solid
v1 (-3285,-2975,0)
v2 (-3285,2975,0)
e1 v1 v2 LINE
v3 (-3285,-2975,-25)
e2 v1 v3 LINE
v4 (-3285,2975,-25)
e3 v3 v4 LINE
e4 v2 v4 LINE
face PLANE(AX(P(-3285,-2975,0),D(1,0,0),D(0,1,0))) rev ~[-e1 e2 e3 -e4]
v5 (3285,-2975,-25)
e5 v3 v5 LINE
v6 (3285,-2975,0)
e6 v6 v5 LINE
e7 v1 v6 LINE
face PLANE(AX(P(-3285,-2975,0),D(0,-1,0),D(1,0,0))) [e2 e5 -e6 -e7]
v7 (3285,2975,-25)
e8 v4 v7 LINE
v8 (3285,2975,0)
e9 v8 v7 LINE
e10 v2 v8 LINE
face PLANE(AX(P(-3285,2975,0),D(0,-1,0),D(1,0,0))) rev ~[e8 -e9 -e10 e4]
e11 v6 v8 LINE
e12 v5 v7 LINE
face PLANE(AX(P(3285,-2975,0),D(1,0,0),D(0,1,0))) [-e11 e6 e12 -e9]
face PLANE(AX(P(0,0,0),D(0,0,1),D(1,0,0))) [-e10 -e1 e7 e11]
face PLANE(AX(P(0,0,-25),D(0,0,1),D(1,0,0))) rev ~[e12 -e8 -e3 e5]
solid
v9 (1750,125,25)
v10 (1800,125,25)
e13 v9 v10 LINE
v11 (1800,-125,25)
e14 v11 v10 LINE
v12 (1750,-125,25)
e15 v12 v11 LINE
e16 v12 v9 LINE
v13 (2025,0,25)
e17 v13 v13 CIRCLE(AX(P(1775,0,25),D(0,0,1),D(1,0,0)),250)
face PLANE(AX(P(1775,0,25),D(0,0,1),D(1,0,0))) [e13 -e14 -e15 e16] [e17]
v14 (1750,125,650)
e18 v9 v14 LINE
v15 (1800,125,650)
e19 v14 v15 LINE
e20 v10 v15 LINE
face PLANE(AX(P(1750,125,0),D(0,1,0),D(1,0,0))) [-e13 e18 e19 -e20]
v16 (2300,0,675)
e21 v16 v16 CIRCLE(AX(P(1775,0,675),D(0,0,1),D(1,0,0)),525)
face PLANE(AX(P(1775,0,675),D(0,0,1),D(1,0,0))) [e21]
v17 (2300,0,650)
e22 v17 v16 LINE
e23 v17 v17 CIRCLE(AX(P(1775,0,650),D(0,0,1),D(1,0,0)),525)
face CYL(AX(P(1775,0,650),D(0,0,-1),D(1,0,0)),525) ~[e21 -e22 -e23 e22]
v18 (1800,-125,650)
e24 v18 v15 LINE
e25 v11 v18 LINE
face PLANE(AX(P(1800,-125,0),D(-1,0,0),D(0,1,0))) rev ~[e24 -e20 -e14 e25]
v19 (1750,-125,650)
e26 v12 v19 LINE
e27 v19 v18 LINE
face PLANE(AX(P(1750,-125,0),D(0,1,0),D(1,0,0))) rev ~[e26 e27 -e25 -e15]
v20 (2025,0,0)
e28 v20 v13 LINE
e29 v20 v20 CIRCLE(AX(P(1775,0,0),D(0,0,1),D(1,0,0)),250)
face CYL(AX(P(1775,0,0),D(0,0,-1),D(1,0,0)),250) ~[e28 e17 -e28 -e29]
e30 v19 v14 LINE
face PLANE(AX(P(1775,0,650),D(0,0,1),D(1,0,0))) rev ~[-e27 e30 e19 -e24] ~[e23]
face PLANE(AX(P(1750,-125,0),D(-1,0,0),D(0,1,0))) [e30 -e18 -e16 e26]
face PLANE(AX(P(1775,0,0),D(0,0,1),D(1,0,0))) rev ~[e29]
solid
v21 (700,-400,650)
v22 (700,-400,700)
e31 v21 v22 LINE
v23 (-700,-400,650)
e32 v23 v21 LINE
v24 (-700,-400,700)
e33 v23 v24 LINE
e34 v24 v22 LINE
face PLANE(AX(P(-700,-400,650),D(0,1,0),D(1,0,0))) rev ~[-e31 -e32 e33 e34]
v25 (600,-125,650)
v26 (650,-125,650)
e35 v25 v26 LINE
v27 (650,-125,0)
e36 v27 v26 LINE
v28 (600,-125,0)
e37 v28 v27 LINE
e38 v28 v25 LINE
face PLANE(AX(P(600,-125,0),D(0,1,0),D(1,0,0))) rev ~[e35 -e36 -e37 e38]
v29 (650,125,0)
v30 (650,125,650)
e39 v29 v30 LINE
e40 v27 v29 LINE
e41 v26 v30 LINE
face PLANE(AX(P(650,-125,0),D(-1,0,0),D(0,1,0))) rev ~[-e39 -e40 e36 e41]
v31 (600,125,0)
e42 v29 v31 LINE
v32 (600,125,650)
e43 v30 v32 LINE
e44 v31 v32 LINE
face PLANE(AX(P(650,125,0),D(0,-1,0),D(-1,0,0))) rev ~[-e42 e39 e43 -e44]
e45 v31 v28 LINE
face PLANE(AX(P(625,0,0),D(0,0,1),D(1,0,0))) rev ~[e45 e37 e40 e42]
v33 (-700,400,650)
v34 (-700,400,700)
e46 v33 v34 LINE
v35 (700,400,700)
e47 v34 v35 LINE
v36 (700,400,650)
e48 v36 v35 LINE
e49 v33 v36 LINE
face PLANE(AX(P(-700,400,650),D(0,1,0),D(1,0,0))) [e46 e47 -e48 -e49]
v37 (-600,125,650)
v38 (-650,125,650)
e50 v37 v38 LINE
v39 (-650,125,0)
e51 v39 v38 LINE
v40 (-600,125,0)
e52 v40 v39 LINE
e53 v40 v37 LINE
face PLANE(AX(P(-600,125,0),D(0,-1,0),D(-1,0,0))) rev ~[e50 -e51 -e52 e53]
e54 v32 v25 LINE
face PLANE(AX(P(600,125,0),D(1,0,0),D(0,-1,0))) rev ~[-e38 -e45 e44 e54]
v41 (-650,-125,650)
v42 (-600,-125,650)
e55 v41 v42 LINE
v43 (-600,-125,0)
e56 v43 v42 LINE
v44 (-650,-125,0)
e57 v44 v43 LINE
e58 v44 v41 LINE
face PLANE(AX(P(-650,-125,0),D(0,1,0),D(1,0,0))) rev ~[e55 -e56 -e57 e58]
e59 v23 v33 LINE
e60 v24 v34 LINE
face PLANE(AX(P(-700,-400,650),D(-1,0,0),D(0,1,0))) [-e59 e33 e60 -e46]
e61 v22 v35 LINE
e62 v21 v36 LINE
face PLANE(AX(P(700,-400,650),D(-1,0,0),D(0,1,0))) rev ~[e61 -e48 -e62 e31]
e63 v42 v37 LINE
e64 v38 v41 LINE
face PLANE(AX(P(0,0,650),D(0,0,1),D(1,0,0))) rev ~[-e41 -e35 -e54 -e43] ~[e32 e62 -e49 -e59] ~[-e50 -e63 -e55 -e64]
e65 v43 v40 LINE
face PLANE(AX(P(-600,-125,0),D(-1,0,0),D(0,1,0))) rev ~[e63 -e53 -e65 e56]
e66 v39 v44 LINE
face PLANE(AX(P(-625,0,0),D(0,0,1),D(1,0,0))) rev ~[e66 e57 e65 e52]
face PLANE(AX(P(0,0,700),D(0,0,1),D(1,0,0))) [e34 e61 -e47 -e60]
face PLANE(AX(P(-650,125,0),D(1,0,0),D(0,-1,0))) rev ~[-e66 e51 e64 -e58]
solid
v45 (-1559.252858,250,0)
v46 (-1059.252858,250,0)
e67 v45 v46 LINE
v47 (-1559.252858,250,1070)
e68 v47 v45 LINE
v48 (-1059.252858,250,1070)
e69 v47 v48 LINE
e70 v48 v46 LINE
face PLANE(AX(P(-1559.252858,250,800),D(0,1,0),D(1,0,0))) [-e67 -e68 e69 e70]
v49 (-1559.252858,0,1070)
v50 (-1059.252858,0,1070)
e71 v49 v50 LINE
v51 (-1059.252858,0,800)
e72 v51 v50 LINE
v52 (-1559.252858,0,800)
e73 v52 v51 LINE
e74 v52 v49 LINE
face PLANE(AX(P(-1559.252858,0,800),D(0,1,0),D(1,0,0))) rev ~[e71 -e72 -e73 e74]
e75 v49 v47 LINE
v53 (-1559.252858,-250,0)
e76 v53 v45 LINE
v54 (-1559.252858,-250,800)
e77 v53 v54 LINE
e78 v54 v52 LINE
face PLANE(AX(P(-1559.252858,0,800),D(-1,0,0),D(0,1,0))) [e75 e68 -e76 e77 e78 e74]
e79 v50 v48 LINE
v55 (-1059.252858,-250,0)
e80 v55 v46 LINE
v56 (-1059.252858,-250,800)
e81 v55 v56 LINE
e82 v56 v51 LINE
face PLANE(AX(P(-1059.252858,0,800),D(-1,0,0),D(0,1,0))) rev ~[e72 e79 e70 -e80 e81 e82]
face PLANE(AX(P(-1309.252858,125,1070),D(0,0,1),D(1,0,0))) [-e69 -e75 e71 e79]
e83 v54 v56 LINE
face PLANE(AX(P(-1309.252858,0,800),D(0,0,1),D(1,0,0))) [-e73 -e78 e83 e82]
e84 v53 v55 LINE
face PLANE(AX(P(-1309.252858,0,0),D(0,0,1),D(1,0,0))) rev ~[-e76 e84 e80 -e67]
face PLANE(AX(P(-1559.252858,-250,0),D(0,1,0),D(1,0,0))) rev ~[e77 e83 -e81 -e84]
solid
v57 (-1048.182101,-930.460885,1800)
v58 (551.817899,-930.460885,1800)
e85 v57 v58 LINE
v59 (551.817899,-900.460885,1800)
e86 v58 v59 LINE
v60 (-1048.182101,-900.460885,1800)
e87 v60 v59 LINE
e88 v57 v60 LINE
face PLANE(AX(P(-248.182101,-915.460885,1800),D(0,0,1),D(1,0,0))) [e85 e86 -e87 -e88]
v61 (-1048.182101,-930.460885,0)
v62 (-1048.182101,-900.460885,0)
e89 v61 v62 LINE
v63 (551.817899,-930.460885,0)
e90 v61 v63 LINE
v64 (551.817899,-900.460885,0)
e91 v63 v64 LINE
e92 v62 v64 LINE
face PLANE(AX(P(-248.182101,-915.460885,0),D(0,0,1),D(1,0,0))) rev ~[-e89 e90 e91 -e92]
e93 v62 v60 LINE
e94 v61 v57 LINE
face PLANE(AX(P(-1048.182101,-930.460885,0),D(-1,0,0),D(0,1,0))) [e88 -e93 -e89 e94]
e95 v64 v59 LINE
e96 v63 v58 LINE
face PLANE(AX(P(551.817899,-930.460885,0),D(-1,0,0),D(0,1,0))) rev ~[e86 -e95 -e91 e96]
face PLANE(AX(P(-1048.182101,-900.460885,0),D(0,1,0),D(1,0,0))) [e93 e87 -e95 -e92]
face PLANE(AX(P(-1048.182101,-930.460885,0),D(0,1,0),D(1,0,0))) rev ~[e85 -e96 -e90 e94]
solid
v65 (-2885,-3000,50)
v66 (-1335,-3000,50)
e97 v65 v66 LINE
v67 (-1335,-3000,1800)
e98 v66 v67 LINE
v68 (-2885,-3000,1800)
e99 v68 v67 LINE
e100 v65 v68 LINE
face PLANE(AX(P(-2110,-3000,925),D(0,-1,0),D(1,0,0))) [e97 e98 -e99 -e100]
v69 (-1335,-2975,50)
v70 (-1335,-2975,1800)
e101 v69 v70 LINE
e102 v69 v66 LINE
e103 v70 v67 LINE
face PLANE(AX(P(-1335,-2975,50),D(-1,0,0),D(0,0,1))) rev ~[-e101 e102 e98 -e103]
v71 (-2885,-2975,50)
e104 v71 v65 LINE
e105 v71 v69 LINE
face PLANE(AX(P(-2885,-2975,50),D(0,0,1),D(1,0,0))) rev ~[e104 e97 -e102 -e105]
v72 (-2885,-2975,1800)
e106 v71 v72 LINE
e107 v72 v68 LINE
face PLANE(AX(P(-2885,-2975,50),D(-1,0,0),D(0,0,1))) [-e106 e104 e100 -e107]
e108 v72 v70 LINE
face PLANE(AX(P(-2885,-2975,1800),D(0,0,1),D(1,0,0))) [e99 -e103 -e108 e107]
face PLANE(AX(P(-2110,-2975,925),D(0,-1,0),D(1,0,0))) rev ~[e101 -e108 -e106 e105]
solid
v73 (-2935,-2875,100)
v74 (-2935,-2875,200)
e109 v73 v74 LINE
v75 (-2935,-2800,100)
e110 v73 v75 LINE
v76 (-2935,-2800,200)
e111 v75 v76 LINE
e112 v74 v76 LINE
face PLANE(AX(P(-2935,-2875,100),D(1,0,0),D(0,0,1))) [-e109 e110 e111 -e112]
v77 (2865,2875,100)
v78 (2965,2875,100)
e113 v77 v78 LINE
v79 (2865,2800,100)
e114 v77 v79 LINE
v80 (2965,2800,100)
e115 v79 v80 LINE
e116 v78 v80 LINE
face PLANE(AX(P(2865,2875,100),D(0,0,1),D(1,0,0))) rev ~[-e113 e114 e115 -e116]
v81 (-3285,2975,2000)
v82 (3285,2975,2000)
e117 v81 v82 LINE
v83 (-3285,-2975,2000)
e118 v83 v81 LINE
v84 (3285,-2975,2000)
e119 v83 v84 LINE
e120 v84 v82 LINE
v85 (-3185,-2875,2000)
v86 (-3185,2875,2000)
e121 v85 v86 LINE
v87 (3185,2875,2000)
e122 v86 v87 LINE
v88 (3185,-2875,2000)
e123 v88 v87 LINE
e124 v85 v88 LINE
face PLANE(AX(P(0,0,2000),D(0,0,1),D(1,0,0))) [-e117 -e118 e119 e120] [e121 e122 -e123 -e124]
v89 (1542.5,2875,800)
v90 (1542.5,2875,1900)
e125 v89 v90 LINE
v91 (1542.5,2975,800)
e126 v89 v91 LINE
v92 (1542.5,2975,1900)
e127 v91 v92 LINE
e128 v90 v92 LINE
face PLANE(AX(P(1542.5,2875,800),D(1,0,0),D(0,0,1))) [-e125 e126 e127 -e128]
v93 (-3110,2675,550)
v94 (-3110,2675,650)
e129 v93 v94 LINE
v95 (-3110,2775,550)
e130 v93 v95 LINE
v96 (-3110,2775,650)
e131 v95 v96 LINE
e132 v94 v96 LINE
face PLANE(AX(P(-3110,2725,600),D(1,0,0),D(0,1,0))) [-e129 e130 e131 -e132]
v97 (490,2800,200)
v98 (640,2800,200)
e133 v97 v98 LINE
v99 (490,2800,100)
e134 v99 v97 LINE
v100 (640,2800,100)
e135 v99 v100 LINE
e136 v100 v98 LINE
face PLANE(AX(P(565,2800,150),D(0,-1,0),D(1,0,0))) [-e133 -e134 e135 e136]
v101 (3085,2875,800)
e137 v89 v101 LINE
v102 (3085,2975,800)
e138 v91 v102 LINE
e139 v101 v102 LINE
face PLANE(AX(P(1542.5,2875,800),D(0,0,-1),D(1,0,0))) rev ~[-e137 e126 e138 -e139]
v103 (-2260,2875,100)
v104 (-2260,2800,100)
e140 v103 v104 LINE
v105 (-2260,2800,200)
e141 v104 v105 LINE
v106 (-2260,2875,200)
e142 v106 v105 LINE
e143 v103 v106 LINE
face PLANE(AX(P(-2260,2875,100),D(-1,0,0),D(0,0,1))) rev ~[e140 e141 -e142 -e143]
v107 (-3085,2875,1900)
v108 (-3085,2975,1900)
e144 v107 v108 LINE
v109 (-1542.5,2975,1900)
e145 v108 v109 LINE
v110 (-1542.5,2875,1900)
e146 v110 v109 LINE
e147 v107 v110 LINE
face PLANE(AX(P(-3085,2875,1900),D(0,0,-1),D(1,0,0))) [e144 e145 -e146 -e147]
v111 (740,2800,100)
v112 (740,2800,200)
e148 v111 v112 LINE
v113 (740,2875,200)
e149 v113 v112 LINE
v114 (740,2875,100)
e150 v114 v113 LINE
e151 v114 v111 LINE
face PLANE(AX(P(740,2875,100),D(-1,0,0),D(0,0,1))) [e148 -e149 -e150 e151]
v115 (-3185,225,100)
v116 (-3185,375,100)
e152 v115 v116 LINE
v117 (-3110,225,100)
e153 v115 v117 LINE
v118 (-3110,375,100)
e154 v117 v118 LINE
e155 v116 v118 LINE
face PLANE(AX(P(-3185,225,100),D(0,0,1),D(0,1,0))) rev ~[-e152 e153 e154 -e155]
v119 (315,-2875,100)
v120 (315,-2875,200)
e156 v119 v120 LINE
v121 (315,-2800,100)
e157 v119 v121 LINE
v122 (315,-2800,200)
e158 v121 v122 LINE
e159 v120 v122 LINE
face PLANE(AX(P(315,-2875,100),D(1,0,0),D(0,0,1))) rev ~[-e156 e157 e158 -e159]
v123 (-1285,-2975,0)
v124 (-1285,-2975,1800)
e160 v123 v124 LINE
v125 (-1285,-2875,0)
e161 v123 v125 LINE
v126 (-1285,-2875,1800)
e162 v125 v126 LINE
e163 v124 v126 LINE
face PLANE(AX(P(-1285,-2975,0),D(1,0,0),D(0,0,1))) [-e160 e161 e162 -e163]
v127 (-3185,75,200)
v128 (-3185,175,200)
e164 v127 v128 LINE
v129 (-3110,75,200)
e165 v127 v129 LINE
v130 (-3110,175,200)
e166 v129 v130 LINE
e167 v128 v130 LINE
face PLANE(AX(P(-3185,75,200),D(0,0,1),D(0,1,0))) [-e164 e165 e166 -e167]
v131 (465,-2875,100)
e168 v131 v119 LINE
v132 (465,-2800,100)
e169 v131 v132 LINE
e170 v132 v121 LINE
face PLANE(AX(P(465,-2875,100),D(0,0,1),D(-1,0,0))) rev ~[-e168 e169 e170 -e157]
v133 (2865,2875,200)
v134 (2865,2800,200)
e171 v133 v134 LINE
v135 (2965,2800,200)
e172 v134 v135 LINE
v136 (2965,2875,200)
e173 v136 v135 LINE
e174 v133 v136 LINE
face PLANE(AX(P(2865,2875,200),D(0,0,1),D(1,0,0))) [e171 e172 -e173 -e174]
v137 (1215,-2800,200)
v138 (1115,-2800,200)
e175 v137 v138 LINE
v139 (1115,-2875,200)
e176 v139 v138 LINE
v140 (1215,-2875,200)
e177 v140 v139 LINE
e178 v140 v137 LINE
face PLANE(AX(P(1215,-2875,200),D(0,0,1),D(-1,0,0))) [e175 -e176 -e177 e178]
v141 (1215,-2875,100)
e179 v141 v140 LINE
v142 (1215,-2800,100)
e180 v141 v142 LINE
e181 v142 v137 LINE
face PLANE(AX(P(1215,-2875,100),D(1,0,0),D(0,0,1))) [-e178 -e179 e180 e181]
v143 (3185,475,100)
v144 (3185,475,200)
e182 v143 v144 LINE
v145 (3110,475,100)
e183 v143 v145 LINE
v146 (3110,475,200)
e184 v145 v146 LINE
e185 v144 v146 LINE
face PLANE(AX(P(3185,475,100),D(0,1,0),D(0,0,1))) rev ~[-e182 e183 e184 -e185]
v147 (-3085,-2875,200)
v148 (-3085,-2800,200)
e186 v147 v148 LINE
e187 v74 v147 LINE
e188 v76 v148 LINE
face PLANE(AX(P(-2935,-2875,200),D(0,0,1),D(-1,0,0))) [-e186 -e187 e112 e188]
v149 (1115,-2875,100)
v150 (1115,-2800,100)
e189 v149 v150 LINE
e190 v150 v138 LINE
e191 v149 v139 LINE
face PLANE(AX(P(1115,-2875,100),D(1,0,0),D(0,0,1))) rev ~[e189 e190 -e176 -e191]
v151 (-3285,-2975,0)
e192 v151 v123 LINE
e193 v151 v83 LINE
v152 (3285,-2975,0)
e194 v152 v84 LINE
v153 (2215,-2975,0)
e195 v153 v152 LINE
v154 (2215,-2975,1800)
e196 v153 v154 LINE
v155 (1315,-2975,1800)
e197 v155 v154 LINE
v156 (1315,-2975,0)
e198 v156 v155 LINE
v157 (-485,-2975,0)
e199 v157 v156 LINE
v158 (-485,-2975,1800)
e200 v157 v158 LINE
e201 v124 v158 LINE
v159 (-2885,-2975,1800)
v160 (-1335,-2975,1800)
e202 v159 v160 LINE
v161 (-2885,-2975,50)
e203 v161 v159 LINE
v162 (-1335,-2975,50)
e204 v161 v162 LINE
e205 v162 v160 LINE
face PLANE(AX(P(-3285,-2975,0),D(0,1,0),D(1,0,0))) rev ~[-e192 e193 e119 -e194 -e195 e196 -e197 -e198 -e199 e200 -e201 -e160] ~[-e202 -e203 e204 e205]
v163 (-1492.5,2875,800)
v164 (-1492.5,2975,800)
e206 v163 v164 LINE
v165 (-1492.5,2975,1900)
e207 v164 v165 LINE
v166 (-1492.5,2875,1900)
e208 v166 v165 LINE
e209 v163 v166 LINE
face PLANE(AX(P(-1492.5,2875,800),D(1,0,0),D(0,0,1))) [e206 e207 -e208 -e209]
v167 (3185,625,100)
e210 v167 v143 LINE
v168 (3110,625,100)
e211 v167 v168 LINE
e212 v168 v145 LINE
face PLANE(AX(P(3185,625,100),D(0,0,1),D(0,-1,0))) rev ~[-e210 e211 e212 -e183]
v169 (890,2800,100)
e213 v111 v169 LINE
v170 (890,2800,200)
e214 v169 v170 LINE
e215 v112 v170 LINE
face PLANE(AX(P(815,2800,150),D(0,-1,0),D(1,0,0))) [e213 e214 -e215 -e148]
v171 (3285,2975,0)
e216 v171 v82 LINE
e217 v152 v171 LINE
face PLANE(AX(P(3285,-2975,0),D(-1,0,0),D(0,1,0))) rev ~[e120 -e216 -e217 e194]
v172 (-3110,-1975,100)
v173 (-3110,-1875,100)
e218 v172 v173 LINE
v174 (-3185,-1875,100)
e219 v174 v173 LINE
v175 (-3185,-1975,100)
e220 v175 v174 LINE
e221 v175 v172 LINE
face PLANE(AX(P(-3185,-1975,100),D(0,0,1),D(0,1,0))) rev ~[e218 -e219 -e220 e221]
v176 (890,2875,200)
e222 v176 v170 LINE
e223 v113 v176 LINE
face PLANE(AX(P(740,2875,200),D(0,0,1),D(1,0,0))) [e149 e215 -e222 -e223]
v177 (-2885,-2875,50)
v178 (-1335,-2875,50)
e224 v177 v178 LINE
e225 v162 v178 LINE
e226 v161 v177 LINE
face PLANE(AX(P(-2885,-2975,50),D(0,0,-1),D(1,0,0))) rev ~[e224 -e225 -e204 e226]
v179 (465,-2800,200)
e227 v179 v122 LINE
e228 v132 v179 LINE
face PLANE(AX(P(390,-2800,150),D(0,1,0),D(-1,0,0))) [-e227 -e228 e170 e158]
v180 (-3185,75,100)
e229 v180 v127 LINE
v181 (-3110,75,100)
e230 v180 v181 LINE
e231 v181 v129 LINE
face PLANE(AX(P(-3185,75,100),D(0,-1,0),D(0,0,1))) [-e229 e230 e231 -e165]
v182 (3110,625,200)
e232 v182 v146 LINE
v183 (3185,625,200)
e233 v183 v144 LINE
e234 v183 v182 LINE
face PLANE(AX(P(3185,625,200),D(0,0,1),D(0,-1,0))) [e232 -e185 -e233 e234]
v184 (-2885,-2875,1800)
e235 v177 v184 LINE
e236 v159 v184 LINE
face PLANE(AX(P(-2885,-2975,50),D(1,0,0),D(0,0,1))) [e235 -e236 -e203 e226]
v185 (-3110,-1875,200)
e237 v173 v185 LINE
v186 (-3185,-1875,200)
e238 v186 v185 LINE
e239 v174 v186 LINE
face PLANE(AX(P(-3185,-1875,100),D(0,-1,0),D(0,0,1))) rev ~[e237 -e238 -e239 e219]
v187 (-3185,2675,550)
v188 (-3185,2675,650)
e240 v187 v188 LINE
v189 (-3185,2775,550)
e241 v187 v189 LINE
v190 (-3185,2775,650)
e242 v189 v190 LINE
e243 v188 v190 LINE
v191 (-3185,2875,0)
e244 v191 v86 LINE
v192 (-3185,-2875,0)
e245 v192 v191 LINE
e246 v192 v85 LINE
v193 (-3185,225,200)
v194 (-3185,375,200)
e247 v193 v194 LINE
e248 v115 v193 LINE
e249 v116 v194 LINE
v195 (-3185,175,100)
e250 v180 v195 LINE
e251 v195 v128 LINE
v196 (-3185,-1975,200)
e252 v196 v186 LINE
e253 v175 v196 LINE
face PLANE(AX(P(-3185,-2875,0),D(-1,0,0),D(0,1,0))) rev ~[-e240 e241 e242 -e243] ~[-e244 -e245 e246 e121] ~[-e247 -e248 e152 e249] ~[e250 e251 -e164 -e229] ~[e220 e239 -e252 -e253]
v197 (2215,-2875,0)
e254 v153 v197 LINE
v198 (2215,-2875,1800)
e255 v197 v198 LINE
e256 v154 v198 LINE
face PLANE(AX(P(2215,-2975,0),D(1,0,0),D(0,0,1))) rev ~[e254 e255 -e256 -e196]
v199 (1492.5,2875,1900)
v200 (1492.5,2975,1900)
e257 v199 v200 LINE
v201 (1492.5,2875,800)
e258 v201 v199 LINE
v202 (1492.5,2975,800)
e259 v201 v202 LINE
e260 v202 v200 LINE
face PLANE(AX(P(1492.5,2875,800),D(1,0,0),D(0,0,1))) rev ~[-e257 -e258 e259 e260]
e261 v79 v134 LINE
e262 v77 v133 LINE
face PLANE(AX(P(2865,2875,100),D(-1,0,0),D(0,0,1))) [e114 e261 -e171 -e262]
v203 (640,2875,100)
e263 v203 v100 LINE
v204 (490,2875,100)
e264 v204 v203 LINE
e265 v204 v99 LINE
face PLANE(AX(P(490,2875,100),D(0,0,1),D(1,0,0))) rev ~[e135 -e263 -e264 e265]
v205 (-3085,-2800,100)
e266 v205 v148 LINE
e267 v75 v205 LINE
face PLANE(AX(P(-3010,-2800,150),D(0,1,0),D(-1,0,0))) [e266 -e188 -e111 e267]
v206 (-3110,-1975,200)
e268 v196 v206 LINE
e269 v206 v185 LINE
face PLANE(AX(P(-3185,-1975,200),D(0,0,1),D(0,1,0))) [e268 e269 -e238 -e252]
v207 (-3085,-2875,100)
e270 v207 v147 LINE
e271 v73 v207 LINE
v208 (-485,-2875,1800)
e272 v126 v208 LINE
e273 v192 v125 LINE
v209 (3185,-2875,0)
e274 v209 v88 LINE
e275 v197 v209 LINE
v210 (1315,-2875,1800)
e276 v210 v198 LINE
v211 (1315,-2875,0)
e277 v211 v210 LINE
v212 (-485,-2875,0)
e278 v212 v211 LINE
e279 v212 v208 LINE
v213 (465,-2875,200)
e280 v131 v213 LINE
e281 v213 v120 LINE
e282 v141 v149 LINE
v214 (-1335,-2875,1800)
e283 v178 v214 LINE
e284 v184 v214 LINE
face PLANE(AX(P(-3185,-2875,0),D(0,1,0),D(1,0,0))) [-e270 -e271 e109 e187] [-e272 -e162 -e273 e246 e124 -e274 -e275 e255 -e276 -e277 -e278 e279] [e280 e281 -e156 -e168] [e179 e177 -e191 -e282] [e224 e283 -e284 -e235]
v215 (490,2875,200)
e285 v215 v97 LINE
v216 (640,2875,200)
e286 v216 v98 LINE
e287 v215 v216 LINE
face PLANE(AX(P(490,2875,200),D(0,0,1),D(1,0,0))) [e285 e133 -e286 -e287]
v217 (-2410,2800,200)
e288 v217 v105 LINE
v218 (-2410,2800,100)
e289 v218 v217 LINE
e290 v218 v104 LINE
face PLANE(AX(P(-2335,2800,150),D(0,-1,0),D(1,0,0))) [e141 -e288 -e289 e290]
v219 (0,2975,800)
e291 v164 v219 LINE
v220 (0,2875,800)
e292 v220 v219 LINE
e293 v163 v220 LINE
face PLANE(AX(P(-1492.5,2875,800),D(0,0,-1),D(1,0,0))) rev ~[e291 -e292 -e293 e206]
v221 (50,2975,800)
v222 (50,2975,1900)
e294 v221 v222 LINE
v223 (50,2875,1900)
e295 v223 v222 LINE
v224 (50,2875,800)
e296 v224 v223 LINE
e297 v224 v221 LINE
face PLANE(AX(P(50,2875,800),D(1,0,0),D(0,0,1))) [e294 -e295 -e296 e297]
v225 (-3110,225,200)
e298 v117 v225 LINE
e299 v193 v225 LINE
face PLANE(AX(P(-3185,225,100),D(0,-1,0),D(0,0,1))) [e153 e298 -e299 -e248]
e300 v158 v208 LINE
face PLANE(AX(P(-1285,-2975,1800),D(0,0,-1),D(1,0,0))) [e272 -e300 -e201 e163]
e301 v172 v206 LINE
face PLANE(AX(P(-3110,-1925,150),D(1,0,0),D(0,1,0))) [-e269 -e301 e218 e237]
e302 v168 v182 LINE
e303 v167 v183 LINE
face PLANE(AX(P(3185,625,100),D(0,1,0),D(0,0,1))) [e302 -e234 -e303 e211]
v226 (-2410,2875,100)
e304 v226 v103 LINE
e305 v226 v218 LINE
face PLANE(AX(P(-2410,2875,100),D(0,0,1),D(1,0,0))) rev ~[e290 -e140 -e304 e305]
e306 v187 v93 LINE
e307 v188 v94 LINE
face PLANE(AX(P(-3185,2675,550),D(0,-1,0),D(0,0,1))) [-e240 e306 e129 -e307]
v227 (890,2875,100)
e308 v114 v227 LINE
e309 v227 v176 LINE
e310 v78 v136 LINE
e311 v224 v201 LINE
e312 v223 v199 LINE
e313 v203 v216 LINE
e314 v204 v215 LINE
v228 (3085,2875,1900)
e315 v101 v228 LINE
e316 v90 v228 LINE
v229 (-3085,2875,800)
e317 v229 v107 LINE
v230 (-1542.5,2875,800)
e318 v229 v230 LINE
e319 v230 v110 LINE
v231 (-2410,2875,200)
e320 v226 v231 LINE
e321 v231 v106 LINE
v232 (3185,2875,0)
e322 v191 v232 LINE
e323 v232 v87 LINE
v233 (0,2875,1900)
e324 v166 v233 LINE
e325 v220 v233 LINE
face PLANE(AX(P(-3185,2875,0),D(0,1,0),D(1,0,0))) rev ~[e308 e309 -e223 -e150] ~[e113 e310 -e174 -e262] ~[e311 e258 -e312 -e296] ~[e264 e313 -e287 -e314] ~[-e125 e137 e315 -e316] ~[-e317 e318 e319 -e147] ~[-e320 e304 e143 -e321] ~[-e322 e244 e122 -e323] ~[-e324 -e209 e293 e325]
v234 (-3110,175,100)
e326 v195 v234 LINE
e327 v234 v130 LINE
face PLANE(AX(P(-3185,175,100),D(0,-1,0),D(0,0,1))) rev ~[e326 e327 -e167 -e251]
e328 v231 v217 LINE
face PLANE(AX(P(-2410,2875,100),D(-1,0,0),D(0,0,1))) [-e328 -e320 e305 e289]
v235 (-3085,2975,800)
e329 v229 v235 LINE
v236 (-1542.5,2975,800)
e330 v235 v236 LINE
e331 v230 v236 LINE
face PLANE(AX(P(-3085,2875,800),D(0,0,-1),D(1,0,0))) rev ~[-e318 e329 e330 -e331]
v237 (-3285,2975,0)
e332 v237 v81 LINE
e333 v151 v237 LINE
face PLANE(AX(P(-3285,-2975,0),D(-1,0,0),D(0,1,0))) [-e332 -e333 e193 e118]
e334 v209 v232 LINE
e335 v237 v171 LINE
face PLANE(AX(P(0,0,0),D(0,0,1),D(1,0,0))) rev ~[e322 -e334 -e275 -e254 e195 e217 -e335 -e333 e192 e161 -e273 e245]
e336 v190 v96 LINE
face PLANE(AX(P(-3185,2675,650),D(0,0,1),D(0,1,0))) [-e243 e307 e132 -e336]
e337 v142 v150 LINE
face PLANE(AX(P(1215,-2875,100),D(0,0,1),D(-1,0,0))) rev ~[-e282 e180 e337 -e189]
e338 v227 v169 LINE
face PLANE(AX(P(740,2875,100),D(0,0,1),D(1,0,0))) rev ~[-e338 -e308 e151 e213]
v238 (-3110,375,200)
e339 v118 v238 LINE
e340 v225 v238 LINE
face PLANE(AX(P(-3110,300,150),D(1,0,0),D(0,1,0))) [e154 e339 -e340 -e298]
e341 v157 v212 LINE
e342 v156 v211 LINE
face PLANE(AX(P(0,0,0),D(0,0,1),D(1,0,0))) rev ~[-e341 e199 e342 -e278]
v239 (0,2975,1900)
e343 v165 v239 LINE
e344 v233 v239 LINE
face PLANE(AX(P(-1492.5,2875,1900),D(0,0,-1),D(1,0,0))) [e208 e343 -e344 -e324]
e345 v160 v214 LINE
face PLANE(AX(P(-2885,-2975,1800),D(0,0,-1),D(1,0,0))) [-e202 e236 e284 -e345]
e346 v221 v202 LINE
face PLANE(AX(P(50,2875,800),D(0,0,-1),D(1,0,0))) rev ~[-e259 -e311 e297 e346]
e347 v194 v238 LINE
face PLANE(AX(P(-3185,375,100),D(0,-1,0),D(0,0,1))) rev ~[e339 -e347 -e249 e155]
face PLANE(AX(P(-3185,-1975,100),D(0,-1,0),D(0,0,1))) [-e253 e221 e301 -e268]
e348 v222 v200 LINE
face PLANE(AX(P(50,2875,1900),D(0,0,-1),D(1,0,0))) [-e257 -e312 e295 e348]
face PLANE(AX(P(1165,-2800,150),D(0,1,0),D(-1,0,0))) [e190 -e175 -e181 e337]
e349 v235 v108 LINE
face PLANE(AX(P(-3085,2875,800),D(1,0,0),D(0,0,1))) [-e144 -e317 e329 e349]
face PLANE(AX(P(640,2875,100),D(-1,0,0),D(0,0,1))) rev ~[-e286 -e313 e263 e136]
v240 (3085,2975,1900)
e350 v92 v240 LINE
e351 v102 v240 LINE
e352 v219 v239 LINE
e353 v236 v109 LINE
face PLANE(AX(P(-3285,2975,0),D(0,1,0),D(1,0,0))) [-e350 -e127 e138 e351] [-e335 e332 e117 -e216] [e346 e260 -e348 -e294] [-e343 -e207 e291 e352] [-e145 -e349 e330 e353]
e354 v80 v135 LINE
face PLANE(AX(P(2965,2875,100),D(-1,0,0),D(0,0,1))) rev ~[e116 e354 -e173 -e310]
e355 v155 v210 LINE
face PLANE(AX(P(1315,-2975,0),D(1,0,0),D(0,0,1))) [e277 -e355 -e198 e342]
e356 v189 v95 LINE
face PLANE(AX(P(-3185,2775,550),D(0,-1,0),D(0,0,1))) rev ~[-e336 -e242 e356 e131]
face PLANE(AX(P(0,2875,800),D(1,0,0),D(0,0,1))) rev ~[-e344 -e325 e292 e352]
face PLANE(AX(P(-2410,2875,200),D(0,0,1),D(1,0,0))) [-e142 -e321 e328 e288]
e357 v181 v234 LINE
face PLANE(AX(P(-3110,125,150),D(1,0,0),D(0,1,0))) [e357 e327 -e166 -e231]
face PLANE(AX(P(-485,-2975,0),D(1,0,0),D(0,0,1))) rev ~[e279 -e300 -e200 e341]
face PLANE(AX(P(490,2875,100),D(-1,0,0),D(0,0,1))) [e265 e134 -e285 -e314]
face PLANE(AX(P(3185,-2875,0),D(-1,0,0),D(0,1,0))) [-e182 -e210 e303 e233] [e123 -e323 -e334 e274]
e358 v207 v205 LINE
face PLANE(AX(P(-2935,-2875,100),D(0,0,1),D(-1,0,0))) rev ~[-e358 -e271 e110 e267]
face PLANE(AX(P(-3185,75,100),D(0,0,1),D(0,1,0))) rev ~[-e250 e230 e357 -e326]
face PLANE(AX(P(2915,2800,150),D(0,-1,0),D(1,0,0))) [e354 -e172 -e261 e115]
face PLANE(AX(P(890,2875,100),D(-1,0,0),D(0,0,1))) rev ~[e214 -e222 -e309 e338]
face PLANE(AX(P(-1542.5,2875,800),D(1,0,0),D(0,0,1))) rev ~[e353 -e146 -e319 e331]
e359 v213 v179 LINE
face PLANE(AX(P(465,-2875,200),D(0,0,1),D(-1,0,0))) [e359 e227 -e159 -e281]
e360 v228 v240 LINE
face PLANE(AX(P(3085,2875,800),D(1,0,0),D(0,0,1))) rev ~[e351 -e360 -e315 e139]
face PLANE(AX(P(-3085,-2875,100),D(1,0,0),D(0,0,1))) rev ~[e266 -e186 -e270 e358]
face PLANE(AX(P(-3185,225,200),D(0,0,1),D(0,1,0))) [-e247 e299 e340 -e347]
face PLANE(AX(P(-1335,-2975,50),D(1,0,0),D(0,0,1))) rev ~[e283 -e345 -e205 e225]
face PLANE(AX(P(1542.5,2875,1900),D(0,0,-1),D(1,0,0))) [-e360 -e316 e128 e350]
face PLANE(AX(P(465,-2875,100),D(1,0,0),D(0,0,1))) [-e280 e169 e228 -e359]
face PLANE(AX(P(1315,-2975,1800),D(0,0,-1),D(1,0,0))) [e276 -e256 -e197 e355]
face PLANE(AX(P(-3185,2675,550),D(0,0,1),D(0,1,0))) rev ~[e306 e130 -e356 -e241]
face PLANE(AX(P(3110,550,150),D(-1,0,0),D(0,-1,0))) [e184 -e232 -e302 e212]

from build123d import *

# Parameters (mm, degrees)
F0_W      = 6570
F0_H      = 5950
F0_W_2    = 6370
F0_H_2    = 5750
F1_DEPTH  = 2000
F2_DEPTH  = 25
F3_W      = 800
F3_H      = 1800
F3_W_2    = 900
F3_W_3    = 1550
F3_H_2    = 1750
F4_DEPTH  = 100
F5_DEPTH  = 25
F6_W      = 1542.5
F6_H      = 1100
F6_W_2    = 1492.5
F6_W_3    = 1442.5
F7_DEPTH  = 100
F9_DEPTH  = 650
F10_W     = 1400
F10_H     = 800
F10_W_2   = 50
F10_H_2   = 250
F11_DEPTH = 50
F8_W      = 50
F8_H      = 250
F12_DEPTH = 650
F8_R      = 250
F13_DEPTH = 25
F14_R     = 525
F14_W     = 50
F14_H     = 250
F15_DEPTH = 25
F16_W     = 100
F16_H     = 100
F16_W_2   = 150
F17_DEPTH = 75
F18_W     = 150
F18_H     = 100
F18_W_2   = 100
F19_DEPTH = 75
F20_W     = 150
F20_H     = 100
F21_DEPTH = 75
F22_W     = 150
F22_H     = 100
F22_W_2   = 100
F23_DEPTH = 75
F24_W     = 500
F24_H     = 500
F25_DEPTH = 800
F26_W     = 500
F26_H     = 250
F27_DEPTH = 270
F28_W     = 1600
F28_H     = 30
F29_DEPTH = 1800


with BuildPart() as f1:
    # F0 (on Top) → F1 (new body)
    with BuildSketch(Plane.XY):
        Rectangle(F0_W, F0_H)
        Rectangle(F0_W_2, F0_H_2, mode=Mode.SUBTRACT)
    extrude(amount=F1_DEPTH)

    # F3 (on face) → F4 (cut, through all)
    with BuildSketch(Plane.XZ.offset(2975)):
        with Locations((-885, 900)):
            Rectangle(F3_W, F3_H)
        with Locations((1765, 900)):
            Rectangle(F3_W_2, F3_H)
        with Locations((-2110, 925)):
            Rectangle(F3_W_3, F3_H_2)
    extrude(amount=-F4_DEPTH, mode=Mode.SUBTRACT)

    # F6 (on face) → F7 (cut, through all)
    with BuildSketch(Plane.XZ.offset(-2875)):
        with Locations((-2313.75, 1350)):
            Rectangle(F6_W, F6_H)
        with Locations((-746.25, 1350)):
            Rectangle(F6_W_2, F6_H)
        with Locations((771.25, 1350)):
            Rectangle(F6_W_3, F6_H)
        with Locations((2313.75, 1350)):
            Rectangle(F6_W, F6_H)
    extrude(amount=-F7_DEPTH, mode=Mode.SUBTRACT)

    # F16 (on face) → F17 (join)
    with BuildSketch(Plane.YZ.offset(-3185)):
        with Locations((2725, 600)):
            Rectangle(F16_W, F16_H)
        with Locations((125, 150)):
            Rectangle(F16_W, F16_H)
        with Locations((300, 150)):
            Rectangle(F16_W_2, F16_H)
        with Locations((-1925, 150)):
            Rectangle(F16_W, F16_H)
    extrude(amount=F17_DEPTH)

    # F18 (on face) → F19 (join)
    with BuildSketch(Plane(origin=(0, -2875, 0), x_dir=(-1, 0, 0), z_dir=(0, 1, 0))):
        with Locations((3010, 150)):
            Rectangle(F18_W, F18_H)
        with Locations((-390, 150)):
            Rectangle(F18_W, F18_H)
        with Locations((-1165, 150)):
            Rectangle(F18_W_2, F18_H)
    extrude(amount=F19_DEPTH)

    # F20 (on face) → F21 (join)
    with BuildSketch(Plane(origin=(3185, 0, 0), x_dir=(0, -1, 0), z_dir=(-1, 0, 0))):
        with Locations((-550, 150)):
            Rectangle(F20_W, F20_H)
    extrude(amount=F21_DEPTH)

    # F22 (on face) → F23 (join)
    with BuildSketch(Plane.XZ.offset(-2875)):
        with Locations((-2335, 150)):
            Rectangle(F22_W, F22_H)
        with Locations((565, 150)):
            Rectangle(F22_W, F22_H)
        with Locations((815, 150)):
            Rectangle(F22_W, F22_H)
        with Locations((2915, 150)):
            Rectangle(F22_W_2, F22_H)
    extrude(amount=F23_DEPTH)


with BuildPart() as f2:
    # F0 (on Top) → F2 (new body)
    with BuildSketch(Plane.XY):
        Rectangle(F0_W, F0_H)
        Rectangle(F0_W_2, F0_H_2, mode=Mode.SUBTRACT)
        Rectangle(F0_W_2, F0_H_2)
    extrude(amount=-F2_DEPTH)


with BuildPart() as f5:
    # F3 (on face) → F5 (new body)
    with BuildSketch(Plane.XZ.offset(2975)):
        with Locations((-2110, 925)):
            Rectangle(F3_W_3, F3_H_2)
    extrude(amount=F5_DEPTH)


with BuildPart() as f9:
    # F8 (on Top) → F9 (new body)
    with BuildSketch(Plane.XY):
        Polygon((-600, 2.5), (-600, 125), (-650, 125), (-650, -125), (-600, -125), (-600, -2.5), align=None)
    extrude(amount=F9_DEPTH)



with BuildPart() as f9b:
    # F8 (on Top) → F9, piece 2 (new body)
    with BuildSketch(Plane.XY):
        Polygon((600, 125), (600, 2.5), (600, -2.5), (600, -125), (650, -125), (650, 125), align=None)
    extrude(amount=F9_DEPTH)


with BuildPart() as f9_1:
    add(f9.part)

    add(f9b.part)  # F11 merges F9b
    # F10 (on face) → F11 (join)
    with BuildSketch(Plane.XY.offset(650)):
        Rectangle(F10_W, F10_H)
        with Locations((-625, 0)):
            Rectangle(F10_W_2, F10_H_2, mode=Mode.SUBTRACT)
        with Locations((-625, 0)):
            Rectangle(F10_W_2, F10_H_2)
    extrude(amount=F11_DEPTH)


with BuildPart() as f12:
    # F8 (on Top) → F12 (new body)
    with BuildSketch(Plane.XY):
        with Locations((1775, 0)):
            Rectangle(F8_W, F8_H)
    extrude(amount=F12_DEPTH)

    # F8 (on Top) → F13 (join)
    with BuildSketch(Plane.XY):
        with Locations((1775, 0)):
            Circle(F8_R)
        with Locations((1775, 0)):
            Rectangle(F8_W, F8_H, mode=Mode.SUBTRACT)
    extrude(amount=F13_DEPTH)

    # F14 (on face) → F15 (join)
    with BuildSketch(Plane.XY.offset(650)):
        with Locations((1775, 0)):
            Circle(F14_R)
        with Locations((1775, 0)):
            Rectangle(F14_W, F14_H, mode=Mode.SUBTRACT)
        with Locations((1775, 0)):
            Rectangle(F14_W, F14_H)
    extrude(amount=F15_DEPTH)


with BuildPart() as f25:
    # F24 (on face) → F25 (new body)
    with BuildSketch(Plane.XY):
        with Locations((-1309.2528581619, 0)):
            Rectangle(F24_W, F24_H)
    extrude(amount=F25_DEPTH)

    # F26 (on face) → F27 (join)
    with BuildSketch(Plane.XY.offset(800)):
        with Locations((-1309.2528581619, 125)):
            Rectangle(F26_W, F26_H)
    extrude(amount=F27_DEPTH)


with BuildPart() as f29:
    # F28 (on face) → F29 (new body)
    with BuildSketch(Plane.XY):
        with Locations((-248.1821009796, -915.4608845711)):
            Rectangle(F28_W, F28_H)
    extrude(amount=F29_DEPTH)


solid = Compound([f1.part, f2.part, f5.part, f9_1.part, f12.part, f25.part, f29.part])
